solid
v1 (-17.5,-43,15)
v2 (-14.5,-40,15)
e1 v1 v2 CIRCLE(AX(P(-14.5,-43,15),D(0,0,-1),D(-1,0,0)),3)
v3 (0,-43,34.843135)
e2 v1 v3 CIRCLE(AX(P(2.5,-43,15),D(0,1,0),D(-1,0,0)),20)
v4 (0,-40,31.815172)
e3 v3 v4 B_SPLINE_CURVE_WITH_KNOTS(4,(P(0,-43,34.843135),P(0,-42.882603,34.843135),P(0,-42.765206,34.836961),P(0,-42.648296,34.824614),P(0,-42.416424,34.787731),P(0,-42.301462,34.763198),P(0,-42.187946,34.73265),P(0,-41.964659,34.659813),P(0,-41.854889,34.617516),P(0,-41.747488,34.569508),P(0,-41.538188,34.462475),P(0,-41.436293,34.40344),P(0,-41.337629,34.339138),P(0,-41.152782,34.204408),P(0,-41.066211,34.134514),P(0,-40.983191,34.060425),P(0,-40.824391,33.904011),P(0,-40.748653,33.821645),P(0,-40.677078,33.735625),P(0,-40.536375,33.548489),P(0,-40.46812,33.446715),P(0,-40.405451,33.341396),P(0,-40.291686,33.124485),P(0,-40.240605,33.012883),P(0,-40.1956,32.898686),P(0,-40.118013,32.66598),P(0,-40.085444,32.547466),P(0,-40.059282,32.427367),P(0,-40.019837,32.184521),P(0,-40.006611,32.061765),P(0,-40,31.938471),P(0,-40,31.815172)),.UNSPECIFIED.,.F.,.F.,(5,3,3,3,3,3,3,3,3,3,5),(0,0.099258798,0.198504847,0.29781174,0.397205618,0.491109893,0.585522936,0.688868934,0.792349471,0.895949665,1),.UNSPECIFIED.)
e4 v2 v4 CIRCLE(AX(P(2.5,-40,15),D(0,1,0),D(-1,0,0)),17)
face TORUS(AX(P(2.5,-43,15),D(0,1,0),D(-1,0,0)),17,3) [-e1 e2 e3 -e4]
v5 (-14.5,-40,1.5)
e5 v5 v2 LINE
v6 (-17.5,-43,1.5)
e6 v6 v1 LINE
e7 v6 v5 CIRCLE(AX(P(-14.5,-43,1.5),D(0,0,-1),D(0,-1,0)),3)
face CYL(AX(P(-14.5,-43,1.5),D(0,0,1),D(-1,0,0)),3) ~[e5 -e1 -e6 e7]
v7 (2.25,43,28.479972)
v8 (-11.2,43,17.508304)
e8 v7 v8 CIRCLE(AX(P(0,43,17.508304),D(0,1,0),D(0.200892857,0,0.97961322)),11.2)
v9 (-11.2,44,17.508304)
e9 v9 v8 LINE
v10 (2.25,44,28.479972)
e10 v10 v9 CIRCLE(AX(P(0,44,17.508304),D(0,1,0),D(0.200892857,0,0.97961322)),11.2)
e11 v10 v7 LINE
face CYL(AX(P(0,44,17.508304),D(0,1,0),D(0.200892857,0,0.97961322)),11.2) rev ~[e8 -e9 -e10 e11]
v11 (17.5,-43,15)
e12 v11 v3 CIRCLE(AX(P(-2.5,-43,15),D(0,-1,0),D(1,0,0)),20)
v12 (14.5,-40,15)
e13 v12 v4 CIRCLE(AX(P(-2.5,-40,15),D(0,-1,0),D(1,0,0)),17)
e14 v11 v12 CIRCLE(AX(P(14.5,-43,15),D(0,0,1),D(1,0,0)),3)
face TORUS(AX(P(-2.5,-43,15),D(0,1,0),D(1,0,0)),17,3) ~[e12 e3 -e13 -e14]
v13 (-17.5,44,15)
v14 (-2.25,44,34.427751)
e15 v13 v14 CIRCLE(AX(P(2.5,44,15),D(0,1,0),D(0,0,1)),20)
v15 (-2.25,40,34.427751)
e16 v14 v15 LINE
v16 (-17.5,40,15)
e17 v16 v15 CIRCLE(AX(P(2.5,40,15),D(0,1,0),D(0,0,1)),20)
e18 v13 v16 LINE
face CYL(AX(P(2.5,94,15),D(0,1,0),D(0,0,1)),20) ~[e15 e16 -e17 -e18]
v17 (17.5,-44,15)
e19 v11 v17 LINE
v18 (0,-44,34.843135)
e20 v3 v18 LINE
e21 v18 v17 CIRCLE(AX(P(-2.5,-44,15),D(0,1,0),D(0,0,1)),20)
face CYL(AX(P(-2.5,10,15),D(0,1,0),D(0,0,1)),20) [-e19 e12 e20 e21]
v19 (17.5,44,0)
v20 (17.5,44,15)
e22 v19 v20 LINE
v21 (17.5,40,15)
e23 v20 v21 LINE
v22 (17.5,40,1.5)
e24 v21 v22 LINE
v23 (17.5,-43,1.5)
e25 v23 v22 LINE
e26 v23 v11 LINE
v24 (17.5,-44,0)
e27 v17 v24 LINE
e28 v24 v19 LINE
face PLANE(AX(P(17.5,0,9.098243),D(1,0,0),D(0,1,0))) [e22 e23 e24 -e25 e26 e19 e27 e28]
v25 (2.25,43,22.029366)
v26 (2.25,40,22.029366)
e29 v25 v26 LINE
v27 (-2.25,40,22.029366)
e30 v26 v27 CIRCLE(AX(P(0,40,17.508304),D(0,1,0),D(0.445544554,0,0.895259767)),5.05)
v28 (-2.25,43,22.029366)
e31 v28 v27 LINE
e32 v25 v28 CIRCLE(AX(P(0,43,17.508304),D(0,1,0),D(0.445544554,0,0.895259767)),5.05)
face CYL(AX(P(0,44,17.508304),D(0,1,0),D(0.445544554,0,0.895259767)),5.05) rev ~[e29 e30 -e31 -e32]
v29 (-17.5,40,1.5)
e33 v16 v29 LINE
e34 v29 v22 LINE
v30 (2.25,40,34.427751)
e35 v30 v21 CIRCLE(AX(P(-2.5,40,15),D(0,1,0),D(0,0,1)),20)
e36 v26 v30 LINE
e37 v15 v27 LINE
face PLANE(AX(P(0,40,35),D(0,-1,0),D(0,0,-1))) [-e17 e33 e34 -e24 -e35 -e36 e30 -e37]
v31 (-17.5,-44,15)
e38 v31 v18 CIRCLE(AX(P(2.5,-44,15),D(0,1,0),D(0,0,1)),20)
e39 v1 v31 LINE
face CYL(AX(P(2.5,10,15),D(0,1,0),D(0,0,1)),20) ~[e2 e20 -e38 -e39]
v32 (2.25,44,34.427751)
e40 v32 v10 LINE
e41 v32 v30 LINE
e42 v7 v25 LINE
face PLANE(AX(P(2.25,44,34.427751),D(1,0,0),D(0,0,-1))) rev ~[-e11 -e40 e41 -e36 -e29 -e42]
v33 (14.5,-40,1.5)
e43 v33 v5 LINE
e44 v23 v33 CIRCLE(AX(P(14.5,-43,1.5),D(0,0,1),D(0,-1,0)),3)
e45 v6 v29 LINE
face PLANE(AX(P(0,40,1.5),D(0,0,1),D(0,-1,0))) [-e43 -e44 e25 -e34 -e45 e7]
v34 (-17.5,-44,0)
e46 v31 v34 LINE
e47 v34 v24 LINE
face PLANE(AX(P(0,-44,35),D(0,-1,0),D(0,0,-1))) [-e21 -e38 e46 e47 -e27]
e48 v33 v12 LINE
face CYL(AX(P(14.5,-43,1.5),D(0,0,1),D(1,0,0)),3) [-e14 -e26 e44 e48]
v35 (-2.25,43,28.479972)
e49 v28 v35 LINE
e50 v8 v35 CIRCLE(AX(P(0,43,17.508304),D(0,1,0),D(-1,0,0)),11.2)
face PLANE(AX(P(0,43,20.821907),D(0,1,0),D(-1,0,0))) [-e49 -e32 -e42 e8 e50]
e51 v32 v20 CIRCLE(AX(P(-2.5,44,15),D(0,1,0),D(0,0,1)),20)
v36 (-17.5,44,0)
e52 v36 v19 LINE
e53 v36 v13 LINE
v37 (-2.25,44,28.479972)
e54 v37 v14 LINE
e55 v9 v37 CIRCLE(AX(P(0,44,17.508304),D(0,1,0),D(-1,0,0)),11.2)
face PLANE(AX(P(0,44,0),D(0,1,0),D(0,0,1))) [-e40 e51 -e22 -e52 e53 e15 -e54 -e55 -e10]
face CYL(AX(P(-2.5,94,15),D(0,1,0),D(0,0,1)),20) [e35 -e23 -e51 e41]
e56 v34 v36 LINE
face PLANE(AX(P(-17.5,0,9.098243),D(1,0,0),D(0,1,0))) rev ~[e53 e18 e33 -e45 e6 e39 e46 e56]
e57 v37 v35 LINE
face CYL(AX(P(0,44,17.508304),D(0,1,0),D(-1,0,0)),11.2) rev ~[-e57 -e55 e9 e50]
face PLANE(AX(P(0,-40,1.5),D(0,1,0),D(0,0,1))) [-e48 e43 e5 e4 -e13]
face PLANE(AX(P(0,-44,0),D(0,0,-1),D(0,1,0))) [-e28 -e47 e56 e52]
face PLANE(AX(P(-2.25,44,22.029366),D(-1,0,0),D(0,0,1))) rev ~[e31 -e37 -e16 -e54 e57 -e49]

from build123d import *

# Parameters (mm, degrees)
F1_DEPTH    = 17.5
F2_T1_DEPTH = 104
F2_T3_DEPTH = 104
F4_DEPTH    = 1
F5_DEPTH    = 25
F6_R        = 3


# Not quite as in the source:
# - a fillet or chamfer that OpenCascade refuses, or shapes differently, is made with other operations: its cross-section is extruded or revolved along the edge and cut away or added


with BuildPart() as f1:
    # F0 (on Right) → F1 (new body, symmetric)
    with BuildSketch(Plane.YZ):
        Polygon((-44, 35), (-44, 0), (44, 0), (44, 35), (40, 35), (40, 1.5), (-40, 1.5), (-40, 35), align=None)
    extrude(amount=F1_DEPTH, both=True)

    # F2: fillet of radius 20 on 4 edges, made by hand

    # F2_s2 → F2_t1 (cut)
    with BuildSketch(Plane.XZ.offset(-94)):
        with BuildLine():
            ThreePointArc((-2.5, 35), (11.6421356237, 29.1421356237), (17.5, 15))
            Line((17.5, 15), (17.5, 35))
            Line((17.5, 35), (-2.5, 35))
        make_face()
        with BuildLine():
            ThreePointArc((2.5, 35), (-11.6421356237, 29.1421356237), (-17.5, 15))
            Line((-17.5, 15), (-17.5, 35))
            Line((-17.5, 35), (2.5, 35))
        make_face()
    extrude(amount=F2_T1_DEPTH, mode=Mode.SUBTRACT)

    # F2_s4 → F2_t3 (cut)
    with BuildSketch(Plane.XZ.offset(-10)):
        with BuildLine():
            ThreePointArc((2.5, 35), (-11.6421356237, 29.1421356237), (-17.5, 15))
            Line((-17.5, 15), (-17.5, 35))
            Line((-17.5, 35), (2.5, 35))
        make_face()
        with BuildLine():
            ThreePointArc((-2.5, 35), (11.6421356237, 29.1421356237), (17.5, 15))
            Line((17.5, 15), (17.5, 35))
            Line((17.5, 35), (-2.5, 35))
        make_face()
    extrude(amount=F2_T3_DEPTH, mode=Mode.SUBTRACT)

    # F3 (on face) → F4 (cut)
    with BuildSketch(Plane(origin=(0, 44, 0), x_dir=(-1, 0, 0), z_dir=(0, 1, 0))):
        with BuildLine():
            Line((2.25, 22.0293655688), (2.25, 28.4799718057))
            ThreePointArc((2.25, 28.4799718057), (0, 28.7083037466), (-2.25, 28.4799718057))
            Line((-2.25, 28.4799718057), (-2.25, 22.0293655688))
            ThreePointArc((-2.25, 22.0293655688), (0, 12.4583037466), (2.25, 22.0293655688))
        make_face()
        with BuildLine():
            ThreePointArc((-2.25, 28.4799718057), (-7.0795480082, 8.8295941651), (11.2, 17.5083037466))
            ThreePointArc((11.2, 17.5083037466), (8.6787095815, 24.5878517548), (2.25, 28.4799718057))
            Line((2.25, 28.4799718057), (2.25, 22.0293655688))
            ThreePointArc((2.25, 22.0293655688), (0, 12.4583037466), (-2.25, 22.0293655688))
            Line((-2.25, 22.0293655688), (-2.25, 28.4799718057))
        make_face()
    extrude(amount=-F4_DEPTH, mode=Mode.SUBTRACT)

    # F3 (on face) → F5 (cut)
    with BuildSketch(Plane(origin=(0, 44, 0), x_dir=(-1, 0, 0), z_dir=(0, 1, 0))):
        with BuildLine():
            Line((2.25, 22.0293655688), (2.25, 28.4799718057))
            ThreePointArc((2.25, 28.4799718057), (0, 28.7083037466), (-2.25, 28.4799718057))
            Line((-2.25, 28.4799718057), (-2.25, 22.0293655688))
            ThreePointArc((-2.25, 22.0293655688), (0, 12.4583037466), (2.25, 22.0293655688))
        make_face()
        with BuildLine():
            ThreePointArc((-2.25, 28.4799718057), (0, 28.7083037466), (2.25, 28.4799718057))
            Line((2.25, 28.4799718057), (2.25, 34.4277507705))
            ThreePointArc((2.25, 34.4277507705), (1.1309449156, 34.6676444705), (0, 34.843134833))
            ThreePointArc((0, 34.843134833), (-1.1309449156, 34.6676444705), (-2.25, 34.4277507705))
            Line((-2.25, 34.4277507705), (-2.25, 28.4799718057))
        make_face()
    extrude(amount=-F5_DEPTH, mode=Mode.SUBTRACT)

    # F6
    f6_edges = [f1.edges().sort_by_distance(p)[0] for p in [
        (17.5, -40, 8.25),
        (-17.5, -40, 8.25),
    ]]
    fillet(f6_edges, radius=F6_R)


solid = f1.part
